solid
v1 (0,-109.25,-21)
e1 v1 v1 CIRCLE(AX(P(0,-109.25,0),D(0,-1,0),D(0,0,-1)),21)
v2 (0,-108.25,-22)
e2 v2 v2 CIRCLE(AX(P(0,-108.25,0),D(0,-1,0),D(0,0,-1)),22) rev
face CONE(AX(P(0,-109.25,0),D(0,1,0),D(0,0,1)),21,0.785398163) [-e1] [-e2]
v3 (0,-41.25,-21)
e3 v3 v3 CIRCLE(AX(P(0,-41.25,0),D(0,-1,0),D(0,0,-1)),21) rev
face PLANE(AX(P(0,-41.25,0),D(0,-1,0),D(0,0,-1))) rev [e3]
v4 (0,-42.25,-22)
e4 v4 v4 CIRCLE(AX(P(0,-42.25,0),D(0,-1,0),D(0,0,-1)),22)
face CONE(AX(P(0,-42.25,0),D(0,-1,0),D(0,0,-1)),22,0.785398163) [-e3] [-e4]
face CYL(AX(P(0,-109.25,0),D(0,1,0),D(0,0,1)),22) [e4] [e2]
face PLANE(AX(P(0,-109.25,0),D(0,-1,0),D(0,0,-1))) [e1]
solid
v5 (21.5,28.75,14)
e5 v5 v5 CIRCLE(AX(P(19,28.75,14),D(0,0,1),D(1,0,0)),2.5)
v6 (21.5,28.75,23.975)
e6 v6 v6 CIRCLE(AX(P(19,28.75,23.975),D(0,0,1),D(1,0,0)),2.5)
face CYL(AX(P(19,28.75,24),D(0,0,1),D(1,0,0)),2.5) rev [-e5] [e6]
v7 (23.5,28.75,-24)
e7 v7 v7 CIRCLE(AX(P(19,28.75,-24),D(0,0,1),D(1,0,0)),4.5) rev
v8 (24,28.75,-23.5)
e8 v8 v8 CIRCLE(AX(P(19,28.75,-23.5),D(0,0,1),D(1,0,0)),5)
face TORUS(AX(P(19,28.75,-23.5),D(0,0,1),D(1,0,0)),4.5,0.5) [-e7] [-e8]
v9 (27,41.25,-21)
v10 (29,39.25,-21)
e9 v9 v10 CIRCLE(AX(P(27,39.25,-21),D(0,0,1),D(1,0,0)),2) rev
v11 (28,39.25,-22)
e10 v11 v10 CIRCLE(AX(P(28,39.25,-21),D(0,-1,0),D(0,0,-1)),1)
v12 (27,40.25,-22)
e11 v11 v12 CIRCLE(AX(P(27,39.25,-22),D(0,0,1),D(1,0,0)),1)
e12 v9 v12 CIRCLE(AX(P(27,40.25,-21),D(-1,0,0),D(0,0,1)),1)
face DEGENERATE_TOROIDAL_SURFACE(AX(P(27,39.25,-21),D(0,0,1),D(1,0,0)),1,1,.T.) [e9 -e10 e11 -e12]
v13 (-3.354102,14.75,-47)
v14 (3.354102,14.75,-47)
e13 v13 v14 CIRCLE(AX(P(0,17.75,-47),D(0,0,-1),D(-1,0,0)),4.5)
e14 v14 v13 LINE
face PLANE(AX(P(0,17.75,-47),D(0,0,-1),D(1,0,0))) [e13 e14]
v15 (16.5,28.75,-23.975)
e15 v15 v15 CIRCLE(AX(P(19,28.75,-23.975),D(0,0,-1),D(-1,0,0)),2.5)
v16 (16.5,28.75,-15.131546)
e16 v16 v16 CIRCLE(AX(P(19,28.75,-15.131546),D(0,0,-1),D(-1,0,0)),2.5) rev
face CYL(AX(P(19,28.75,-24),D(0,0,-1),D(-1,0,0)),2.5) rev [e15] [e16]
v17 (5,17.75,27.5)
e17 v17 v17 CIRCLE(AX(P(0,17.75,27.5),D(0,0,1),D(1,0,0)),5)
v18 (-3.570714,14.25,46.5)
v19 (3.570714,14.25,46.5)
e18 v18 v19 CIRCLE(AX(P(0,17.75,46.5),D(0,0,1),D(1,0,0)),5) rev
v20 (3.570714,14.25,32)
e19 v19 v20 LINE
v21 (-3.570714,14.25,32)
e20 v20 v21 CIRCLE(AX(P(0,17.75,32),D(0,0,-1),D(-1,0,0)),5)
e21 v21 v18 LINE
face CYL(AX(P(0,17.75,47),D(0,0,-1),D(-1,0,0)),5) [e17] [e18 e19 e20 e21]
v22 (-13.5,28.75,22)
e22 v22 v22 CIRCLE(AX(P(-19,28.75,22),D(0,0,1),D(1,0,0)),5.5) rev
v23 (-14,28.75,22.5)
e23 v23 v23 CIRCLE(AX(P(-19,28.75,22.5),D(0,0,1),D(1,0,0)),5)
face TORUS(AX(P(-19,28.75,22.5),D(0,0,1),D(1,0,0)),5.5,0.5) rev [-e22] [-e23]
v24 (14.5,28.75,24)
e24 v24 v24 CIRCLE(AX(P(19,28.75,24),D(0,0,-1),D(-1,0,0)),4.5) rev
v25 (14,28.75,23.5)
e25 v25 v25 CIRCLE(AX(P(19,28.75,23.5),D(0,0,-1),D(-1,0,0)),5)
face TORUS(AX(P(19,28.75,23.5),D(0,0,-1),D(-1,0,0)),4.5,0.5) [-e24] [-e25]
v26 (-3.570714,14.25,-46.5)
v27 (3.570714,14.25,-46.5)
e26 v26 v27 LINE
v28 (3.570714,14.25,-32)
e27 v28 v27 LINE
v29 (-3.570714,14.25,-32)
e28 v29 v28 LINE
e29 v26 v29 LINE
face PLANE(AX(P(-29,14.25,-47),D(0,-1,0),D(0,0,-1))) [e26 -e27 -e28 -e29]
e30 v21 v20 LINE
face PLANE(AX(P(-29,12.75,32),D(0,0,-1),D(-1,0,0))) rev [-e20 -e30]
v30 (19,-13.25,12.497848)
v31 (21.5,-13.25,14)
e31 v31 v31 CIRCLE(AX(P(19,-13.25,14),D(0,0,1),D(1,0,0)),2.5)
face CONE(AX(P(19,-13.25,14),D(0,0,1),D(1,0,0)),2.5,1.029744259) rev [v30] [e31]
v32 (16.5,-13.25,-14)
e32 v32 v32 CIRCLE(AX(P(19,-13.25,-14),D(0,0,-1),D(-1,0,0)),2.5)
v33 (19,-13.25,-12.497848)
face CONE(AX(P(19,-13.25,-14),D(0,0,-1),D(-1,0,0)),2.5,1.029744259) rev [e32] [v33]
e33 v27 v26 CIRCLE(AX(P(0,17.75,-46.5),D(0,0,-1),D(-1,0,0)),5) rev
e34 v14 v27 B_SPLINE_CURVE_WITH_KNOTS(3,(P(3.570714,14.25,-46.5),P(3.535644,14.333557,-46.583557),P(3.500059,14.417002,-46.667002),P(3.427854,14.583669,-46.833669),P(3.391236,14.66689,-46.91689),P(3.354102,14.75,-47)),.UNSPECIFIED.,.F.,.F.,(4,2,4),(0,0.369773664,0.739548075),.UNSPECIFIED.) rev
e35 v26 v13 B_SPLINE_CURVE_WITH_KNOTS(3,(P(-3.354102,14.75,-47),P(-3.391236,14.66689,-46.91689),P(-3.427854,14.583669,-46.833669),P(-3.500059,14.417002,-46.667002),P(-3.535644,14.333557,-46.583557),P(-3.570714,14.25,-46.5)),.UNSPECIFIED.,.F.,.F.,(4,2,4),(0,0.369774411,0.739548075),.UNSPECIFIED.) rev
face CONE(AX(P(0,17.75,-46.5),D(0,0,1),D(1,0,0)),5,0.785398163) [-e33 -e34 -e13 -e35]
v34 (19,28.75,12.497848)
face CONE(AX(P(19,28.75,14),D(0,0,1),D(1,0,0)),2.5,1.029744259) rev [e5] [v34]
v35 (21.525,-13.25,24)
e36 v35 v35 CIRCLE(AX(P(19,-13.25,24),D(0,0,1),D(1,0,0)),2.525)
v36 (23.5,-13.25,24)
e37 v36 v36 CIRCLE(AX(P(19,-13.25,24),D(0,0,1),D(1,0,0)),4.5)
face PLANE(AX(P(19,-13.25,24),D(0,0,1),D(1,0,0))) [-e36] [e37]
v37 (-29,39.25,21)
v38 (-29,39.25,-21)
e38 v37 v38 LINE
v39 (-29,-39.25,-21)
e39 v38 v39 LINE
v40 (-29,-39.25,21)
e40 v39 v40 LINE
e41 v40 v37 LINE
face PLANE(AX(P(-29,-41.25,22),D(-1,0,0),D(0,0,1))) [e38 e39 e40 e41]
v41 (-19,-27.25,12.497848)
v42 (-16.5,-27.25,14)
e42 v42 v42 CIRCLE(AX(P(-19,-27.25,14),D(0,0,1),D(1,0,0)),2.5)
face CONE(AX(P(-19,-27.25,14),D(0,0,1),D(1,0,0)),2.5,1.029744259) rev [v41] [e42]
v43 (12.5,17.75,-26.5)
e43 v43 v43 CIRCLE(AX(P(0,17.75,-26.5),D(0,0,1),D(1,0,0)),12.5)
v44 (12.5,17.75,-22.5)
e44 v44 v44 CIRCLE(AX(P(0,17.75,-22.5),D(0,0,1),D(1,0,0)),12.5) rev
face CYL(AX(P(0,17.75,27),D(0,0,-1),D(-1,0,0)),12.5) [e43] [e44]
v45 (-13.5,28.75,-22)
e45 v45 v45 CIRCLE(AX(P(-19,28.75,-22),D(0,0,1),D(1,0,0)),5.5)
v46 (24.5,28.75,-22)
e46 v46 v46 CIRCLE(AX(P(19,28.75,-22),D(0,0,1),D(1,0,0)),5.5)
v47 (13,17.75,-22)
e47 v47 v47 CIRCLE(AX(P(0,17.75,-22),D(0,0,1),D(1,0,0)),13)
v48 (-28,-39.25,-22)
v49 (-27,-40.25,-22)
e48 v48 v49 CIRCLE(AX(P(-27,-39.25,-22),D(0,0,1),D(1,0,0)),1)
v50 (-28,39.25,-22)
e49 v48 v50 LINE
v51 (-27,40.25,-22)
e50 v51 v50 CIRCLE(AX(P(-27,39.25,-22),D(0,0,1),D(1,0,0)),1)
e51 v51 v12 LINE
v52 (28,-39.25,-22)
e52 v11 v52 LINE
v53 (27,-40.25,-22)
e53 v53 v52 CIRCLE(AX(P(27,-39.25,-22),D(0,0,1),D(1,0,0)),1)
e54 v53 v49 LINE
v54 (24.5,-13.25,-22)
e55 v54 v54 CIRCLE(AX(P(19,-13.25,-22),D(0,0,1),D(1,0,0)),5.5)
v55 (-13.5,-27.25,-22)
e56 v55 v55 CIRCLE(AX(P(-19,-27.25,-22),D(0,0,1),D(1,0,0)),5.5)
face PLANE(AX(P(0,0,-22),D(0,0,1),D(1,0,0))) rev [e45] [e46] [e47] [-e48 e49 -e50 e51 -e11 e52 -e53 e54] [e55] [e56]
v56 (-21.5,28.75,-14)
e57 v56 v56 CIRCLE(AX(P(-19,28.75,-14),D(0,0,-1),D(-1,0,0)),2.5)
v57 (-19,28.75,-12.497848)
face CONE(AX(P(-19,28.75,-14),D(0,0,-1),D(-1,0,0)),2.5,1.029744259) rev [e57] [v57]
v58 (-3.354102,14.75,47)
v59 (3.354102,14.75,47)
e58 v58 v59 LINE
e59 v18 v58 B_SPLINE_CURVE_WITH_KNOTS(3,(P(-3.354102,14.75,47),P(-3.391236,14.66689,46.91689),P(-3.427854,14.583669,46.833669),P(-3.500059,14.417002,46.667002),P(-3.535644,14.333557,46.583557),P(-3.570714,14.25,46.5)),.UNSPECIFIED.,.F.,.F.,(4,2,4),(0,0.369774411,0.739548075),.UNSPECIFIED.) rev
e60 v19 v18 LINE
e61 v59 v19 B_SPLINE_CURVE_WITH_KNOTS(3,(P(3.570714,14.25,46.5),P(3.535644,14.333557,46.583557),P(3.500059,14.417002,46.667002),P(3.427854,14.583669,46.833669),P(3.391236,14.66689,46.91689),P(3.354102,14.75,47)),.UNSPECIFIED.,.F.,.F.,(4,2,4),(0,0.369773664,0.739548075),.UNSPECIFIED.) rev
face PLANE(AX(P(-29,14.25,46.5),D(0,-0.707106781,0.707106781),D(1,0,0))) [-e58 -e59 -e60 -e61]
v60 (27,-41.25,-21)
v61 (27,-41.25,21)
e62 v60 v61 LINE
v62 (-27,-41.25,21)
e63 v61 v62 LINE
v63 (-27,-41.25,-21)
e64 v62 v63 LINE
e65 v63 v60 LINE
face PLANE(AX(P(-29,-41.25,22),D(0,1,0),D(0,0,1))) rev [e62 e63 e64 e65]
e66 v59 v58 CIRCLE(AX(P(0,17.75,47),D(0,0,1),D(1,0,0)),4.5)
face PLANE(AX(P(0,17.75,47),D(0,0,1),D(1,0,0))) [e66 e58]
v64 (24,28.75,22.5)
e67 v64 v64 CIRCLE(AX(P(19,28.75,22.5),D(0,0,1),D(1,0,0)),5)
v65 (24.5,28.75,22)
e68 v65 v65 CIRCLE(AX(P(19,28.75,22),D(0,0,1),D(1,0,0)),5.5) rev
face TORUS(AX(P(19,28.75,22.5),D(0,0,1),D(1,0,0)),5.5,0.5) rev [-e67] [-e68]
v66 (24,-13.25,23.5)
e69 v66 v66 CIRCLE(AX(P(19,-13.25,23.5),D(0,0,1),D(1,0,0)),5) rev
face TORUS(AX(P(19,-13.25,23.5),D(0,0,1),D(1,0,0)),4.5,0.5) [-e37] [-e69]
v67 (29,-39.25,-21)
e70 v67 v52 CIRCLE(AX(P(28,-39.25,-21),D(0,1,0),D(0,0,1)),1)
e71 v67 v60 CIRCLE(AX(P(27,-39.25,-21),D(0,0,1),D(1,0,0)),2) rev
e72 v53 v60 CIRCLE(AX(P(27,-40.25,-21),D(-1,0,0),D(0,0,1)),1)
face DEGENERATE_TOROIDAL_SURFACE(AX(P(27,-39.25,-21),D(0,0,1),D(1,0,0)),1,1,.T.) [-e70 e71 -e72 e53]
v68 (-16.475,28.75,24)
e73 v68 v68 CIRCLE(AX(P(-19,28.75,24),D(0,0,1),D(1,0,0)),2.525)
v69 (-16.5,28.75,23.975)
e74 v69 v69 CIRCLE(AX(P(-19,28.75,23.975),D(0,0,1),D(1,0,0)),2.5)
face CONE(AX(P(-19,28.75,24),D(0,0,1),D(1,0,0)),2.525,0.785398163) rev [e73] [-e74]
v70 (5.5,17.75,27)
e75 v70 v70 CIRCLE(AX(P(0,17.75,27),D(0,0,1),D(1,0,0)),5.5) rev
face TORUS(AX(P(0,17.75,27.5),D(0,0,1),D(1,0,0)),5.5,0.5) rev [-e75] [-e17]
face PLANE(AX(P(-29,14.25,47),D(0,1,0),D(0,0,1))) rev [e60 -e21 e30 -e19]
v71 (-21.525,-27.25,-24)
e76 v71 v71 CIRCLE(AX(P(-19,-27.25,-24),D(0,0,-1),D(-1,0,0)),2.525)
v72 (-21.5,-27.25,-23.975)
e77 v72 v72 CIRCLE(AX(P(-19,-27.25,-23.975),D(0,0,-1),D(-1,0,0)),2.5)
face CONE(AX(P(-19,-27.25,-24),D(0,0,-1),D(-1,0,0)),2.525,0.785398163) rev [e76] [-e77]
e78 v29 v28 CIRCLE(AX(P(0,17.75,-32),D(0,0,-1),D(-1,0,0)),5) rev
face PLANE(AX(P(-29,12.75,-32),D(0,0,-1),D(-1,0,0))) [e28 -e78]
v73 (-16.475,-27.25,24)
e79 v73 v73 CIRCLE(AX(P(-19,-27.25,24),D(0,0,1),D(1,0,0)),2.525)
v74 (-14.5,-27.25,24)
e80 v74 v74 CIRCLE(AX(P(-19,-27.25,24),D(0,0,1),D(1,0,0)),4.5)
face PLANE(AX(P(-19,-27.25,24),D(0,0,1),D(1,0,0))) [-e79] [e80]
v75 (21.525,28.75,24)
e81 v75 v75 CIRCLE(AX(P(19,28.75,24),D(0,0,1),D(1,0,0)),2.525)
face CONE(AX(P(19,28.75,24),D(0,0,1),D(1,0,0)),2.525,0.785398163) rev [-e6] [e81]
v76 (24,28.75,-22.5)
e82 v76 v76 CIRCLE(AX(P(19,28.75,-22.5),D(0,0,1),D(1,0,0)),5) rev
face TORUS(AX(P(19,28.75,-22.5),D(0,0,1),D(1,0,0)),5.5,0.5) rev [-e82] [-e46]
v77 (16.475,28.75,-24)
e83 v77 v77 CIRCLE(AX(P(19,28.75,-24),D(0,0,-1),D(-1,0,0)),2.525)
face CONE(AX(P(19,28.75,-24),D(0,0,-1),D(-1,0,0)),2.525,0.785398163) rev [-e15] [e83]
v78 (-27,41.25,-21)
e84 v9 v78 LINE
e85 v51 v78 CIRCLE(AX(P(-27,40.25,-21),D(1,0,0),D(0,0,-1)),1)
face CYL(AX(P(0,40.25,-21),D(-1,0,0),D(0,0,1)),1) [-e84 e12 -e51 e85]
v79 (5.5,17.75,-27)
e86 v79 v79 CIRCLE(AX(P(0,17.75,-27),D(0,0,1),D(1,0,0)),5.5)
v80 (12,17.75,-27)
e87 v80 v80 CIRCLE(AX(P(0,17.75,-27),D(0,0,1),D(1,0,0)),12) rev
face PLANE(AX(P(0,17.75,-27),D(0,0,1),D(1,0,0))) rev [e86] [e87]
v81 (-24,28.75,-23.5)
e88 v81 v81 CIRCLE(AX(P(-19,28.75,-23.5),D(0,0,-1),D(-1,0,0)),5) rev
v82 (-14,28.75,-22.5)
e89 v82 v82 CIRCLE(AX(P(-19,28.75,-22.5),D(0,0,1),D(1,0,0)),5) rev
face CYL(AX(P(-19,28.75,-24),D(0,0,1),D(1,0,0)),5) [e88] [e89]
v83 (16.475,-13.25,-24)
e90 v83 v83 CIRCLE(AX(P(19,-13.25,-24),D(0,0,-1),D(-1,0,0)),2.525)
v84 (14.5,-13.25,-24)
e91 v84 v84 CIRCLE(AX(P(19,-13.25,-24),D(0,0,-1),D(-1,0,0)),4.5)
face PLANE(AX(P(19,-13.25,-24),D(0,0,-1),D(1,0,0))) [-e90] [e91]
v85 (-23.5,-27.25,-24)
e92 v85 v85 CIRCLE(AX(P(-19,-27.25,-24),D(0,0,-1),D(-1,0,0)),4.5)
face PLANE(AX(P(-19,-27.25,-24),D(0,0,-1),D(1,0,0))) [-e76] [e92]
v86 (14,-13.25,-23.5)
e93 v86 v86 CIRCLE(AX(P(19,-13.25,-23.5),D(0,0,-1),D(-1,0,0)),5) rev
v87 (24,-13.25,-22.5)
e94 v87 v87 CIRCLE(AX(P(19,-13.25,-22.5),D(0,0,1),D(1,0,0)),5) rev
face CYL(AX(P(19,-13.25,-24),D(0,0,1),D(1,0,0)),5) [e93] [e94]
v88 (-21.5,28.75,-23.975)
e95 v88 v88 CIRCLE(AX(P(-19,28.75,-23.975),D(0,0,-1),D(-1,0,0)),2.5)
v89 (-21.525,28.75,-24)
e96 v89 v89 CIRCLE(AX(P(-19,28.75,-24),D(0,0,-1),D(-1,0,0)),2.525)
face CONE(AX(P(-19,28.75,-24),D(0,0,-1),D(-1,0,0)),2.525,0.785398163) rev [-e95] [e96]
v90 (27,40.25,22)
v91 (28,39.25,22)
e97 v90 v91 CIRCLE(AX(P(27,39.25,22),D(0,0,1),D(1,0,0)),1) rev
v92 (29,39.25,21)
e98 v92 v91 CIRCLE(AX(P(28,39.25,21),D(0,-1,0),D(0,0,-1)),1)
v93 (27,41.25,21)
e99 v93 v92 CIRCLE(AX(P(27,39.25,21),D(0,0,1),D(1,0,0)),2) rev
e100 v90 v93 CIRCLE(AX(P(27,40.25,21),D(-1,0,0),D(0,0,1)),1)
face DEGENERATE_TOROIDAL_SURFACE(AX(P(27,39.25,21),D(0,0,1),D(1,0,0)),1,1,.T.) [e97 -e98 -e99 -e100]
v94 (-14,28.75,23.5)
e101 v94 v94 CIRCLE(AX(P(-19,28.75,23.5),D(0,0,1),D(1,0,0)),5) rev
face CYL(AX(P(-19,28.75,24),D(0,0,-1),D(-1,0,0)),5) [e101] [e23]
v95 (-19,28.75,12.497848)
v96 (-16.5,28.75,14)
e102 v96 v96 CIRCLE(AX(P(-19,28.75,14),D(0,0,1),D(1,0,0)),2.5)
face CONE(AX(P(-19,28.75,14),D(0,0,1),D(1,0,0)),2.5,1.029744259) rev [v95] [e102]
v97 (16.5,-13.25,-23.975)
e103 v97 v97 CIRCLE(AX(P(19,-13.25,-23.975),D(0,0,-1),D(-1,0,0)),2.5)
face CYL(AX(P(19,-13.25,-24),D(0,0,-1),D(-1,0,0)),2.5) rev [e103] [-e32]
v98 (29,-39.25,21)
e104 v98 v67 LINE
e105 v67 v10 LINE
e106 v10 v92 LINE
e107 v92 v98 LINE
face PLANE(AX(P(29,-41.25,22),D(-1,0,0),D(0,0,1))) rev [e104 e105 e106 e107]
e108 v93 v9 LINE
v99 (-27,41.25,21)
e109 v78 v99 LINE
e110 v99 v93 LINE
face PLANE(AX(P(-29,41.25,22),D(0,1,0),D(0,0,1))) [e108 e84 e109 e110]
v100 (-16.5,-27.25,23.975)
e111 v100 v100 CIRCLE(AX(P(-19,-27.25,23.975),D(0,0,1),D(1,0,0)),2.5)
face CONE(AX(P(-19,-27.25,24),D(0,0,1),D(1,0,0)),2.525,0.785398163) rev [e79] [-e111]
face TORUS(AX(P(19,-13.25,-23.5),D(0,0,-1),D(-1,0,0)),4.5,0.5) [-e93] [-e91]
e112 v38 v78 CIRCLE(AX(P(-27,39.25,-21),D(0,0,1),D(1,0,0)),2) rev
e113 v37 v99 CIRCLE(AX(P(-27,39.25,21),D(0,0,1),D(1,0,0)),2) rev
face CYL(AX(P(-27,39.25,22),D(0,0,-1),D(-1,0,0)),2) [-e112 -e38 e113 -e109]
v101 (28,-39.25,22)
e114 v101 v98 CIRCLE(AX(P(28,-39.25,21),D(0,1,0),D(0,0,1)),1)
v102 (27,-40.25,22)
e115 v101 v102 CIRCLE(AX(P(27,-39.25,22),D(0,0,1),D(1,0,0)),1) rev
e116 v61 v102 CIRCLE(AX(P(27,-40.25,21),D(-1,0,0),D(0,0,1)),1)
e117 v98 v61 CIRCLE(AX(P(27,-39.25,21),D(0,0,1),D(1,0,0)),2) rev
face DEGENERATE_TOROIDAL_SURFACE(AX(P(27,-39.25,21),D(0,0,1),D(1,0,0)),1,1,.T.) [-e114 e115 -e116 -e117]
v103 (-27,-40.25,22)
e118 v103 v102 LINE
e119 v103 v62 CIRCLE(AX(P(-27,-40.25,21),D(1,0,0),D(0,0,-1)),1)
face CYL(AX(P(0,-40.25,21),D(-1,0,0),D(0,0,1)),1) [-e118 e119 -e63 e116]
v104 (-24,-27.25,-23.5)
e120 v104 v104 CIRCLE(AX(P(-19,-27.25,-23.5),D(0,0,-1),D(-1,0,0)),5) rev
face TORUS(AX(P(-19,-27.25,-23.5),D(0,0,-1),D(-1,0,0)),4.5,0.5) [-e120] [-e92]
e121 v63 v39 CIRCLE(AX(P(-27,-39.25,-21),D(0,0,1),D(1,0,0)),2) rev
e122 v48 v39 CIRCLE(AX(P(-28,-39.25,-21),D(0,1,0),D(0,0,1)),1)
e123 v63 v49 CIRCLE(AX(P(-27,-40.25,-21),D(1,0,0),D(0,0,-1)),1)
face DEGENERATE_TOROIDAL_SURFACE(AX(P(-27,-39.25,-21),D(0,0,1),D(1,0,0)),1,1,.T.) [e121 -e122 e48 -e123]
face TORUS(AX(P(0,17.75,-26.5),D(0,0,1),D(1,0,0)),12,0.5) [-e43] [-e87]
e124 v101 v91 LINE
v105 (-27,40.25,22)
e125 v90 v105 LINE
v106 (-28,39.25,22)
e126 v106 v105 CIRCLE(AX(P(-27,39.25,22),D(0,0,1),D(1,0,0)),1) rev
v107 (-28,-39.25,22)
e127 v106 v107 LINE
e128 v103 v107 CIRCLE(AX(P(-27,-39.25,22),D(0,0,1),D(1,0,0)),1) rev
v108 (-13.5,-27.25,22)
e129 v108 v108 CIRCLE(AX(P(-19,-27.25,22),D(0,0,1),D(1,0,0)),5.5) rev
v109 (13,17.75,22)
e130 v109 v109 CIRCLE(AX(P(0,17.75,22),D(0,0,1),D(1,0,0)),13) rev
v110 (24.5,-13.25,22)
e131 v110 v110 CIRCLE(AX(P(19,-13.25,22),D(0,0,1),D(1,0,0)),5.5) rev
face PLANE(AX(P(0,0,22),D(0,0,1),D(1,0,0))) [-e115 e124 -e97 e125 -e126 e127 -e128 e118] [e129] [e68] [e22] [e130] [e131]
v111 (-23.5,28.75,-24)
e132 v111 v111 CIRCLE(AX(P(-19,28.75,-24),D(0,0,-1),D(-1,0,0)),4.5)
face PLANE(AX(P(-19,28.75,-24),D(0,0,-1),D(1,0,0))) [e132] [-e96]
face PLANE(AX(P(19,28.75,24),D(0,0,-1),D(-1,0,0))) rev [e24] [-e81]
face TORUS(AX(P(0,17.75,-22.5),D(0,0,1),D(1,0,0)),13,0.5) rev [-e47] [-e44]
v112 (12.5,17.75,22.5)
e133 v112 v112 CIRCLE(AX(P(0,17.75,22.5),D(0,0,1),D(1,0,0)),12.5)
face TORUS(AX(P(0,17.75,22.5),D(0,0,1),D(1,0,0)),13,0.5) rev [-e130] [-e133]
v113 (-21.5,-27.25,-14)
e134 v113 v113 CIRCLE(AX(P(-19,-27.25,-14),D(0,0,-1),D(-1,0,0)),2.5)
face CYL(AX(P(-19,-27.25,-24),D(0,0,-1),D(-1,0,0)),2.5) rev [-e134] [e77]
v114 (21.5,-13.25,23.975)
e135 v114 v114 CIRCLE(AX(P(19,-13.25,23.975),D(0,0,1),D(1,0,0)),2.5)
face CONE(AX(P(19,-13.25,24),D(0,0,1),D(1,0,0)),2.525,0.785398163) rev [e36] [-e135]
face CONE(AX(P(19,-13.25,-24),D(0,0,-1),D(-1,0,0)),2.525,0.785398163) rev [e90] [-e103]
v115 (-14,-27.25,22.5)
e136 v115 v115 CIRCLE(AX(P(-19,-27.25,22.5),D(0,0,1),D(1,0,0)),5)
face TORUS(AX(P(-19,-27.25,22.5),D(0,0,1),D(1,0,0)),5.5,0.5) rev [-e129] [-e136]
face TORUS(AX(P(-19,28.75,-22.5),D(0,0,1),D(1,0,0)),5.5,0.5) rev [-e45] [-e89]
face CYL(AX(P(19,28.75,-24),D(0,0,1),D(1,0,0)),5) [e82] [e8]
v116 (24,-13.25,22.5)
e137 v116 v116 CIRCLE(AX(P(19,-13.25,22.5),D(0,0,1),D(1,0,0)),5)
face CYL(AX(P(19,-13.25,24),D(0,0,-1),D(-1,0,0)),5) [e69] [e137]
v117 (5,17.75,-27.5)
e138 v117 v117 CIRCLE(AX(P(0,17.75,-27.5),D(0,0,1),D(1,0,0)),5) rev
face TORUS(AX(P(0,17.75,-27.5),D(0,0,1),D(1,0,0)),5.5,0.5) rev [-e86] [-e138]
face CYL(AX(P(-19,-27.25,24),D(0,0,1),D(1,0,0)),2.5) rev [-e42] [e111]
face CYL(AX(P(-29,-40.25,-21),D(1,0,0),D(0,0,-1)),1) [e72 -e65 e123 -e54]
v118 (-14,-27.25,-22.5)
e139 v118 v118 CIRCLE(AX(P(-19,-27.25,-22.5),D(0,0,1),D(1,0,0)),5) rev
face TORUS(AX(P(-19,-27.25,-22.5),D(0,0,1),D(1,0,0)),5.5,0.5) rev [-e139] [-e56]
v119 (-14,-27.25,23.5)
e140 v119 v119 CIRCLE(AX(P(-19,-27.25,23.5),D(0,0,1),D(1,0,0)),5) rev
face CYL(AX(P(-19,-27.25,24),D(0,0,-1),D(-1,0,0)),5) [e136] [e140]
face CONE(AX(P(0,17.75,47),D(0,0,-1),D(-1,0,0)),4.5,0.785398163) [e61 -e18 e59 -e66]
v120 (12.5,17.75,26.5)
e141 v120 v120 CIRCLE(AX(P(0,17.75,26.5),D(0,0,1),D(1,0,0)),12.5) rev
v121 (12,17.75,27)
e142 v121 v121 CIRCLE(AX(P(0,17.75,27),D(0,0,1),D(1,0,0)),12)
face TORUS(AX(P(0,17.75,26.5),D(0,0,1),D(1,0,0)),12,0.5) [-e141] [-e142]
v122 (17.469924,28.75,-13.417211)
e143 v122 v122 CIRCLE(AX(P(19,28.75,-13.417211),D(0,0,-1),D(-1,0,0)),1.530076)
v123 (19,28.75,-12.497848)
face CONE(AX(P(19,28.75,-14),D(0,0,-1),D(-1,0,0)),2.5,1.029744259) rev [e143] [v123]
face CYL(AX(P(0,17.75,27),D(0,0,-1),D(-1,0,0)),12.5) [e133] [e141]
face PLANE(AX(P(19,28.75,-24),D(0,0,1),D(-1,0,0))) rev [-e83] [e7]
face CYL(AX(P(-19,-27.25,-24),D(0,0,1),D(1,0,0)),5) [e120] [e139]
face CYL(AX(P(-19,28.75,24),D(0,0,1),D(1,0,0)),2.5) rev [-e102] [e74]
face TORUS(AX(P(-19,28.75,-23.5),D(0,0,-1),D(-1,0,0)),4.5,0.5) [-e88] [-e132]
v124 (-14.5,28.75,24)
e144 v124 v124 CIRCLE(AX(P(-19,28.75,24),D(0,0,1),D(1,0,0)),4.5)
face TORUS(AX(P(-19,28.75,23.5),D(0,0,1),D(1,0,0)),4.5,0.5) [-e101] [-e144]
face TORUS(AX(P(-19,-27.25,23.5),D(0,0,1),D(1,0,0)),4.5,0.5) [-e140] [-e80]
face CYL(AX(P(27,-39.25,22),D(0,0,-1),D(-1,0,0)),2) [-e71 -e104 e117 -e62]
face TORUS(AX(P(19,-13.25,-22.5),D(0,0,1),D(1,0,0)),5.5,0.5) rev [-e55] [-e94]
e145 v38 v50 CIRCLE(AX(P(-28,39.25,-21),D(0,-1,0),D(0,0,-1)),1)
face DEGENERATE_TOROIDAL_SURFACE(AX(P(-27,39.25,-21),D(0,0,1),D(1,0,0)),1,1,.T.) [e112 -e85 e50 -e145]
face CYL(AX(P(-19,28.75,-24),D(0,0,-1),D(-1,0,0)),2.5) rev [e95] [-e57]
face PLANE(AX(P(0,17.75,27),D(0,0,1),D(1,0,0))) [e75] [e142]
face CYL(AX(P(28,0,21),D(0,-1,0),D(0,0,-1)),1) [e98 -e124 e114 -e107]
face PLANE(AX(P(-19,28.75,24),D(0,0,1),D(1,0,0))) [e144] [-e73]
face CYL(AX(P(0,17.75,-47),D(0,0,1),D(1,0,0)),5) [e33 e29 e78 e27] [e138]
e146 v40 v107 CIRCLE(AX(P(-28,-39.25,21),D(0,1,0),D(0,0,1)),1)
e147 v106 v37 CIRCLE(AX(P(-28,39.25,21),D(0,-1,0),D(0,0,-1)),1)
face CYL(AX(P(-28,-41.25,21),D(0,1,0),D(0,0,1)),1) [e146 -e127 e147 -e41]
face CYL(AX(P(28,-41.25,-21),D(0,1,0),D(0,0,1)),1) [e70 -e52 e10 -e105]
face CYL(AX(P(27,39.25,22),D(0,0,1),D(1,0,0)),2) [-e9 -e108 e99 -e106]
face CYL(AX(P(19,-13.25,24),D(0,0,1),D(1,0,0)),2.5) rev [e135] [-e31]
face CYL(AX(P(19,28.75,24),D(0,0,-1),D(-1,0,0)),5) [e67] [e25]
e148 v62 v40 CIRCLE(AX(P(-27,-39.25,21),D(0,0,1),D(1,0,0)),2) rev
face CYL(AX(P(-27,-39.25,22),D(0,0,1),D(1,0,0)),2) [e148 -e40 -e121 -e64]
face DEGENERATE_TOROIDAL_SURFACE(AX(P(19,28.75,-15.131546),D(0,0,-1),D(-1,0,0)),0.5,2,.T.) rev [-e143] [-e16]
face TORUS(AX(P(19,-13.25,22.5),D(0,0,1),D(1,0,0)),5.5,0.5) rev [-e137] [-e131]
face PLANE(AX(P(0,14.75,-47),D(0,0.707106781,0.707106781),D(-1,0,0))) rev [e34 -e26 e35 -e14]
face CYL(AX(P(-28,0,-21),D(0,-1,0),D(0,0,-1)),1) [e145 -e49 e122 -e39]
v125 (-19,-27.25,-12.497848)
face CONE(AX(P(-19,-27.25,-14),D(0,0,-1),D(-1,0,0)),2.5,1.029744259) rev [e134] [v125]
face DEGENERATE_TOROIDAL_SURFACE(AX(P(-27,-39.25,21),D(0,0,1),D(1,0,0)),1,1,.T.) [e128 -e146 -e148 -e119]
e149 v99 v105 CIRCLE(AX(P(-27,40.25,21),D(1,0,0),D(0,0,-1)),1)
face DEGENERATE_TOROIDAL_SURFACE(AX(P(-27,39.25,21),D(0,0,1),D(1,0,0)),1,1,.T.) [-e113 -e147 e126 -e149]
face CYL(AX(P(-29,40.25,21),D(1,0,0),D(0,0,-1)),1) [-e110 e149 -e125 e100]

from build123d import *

# Parameters (mm, degrees)
SKETCH1_W                         = 58
SKETCH1_H                         = 82.5
BOSS_EXTRUDE1_DEPTH               = 22
BOSS_EXTRUDE2_START               = -22
SKETCH2_R                         = 12.5
BOSS_EXTRUDE2_DEPTH               = 27
SKETCH3_R                         = 5
BOSS_EXTRUDE3_DEPTH               = 20
SKETCH4_W                         = 15
SKETCH4_H                         = 1.5
CUT_EXTRUDE1_DEPTH                = 69.931578395
SKETCH5_R                         = 5
BOSS_EXTRUDE4_DEPTH               = 2
F_5_0_5_DIAMETER_HOLE1_AT_2_COUNT = 2
F_5_0_5_DIAMETER_HOLE1_AT_2_PITCH = 42
F_5_0_5_DIAMETER_HOLE1_AT_3_COUNT = 2
F_5_0_5_DIAMETER_HOLE1_AT_3_PITCH = 67.675697263
F_5_0_5_DIAMETER_HOLE1_AT_4_COUNT = 2
F_5_0_5_DIAMETER_HOLE1_AT_4_PITCH = 38
CHAMFER1_SIZE                     = 0.5
CHAMFER1_OF_MIRROR3_SIZE          = 0.5
FILLET1_R                         = 0.5
FILLET3_R                         = 1
FILLET4_R                         = 2
SKETCH10_R                        = 22
BOSS_EXTRUDE5_DEPTH               = 68
CHAMFER2_SIZE                     = 1


with BuildPart() as part:
    # Sketch1 → Boss-Extrude1 (new, symmetric)
    with BuildSketch(Plane.XY):
        Rectangle(SKETCH1_W, SKETCH1_H)
    extrude(amount=BOSS_EXTRUDE1_DEPTH, both=True)

    # Sketch2 → Boss-Extrude2 (add, symmetric)
    with BuildSketch(Plane.XY.offset(22).offset(BOSS_EXTRUDE2_START)):
        with Locations((0, 17.75)):
            Circle(SKETCH2_R)
    extrude(amount=BOSS_EXTRUDE2_DEPTH, both=True)

    # Sketch3 → Boss-Extrude3 (add)
    with BuildSketch(Plane.XY.offset(27)):
        with Locations((0, 17.75)):
            Circle(SKETCH3_R)
    boss_extrude3 = extrude(amount=BOSS_EXTRUDE3_DEPTH)

    # Sketch4 → Cut-Extrude1 (cut, symmetric)
    with BuildSketch(Plane(origin=(0, 0, 0), x_dir=(0, 0, -1), z_dir=(1, 0, 0))):
        with Locations((-39.5, 13.5)):
            Rectangle(SKETCH4_W, SKETCH4_H)
    cut_extrude1 = extrude(amount=CUT_EXTRUDE1_DEPTH, both=True, mode=Mode.SUBTRACT)

    # Sketch5 → Boss-Extrude4 (add)
    with BuildSketch(Plane.XY.offset(22)):
        with Locations((-19, 28.75)):
            Circle(SKETCH5_R)
        with Locations(Location((19, 28.75, 0), (0, 0, 180))):
            Circle(SKETCH5_R)
        with Locations((-19, -27.25)):
            Circle(SKETCH5_R)
        with Locations((19, -13.25)):
            Circle(SKETCH5_R)
    boss_extrude4 = extrude(amount=BOSS_EXTRUDE4_DEPTH)

    # Sketch9 → Ø5.0 (5) Diameter Hole1 (revolve, cut)
    with BuildSketch(Plane(origin=(19, 28.75, 24), x_dir=(0, -1, 0), z_dir=(1, 0, 0))):
        Polygon((0, 0), (0, 11.502151548), (2.5, 10), (2.5, 0.025), (2.525, 0), align=None)
    f_5_0_5_diameter_hole1 = revolve(axis=Axis((19, 28.75, 30.35), (0, 0, -1)), mode=Mode.SUBTRACT)

    # Ø5.0 (5) Diameter Hole1 at 2: Ø5.0 (5) Diameter Hole1 ×2
    with Locations(*[(0, -i * F_5_0_5_DIAMETER_HOLE1_AT_2_PITCH, 0) for i in range(1, F_5_0_5_DIAMETER_HOLE1_AT_2_COUNT)]):
        add(f_5_0_5_diameter_hole1, mode=Mode.SUBTRACT)

    # Ø5.0 (5) Diameter Hole1 at 3: Ø5.0 (5) Diameter Hole1 ×2
    with Locations(*[Vector(-0.5615014183372646, -0.8274757743917585, 0) * (i * F_5_0_5_DIAMETER_HOLE1_AT_3_PITCH) for i in range(1, F_5_0_5_DIAMETER_HOLE1_AT_3_COUNT)]):
        add(f_5_0_5_diameter_hole1, mode=Mode.SUBTRACT)

    # Ø5.0 (5) Diameter Hole1 at 4: Ø5.0 (5) Diameter Hole1 ×2
    with Locations(*[(-i * F_5_0_5_DIAMETER_HOLE1_AT_4_PITCH, 0, 0) for i in range(1, F_5_0_5_DIAMETER_HOLE1_AT_4_COUNT)]):
        add(f_5_0_5_diameter_hole1, mode=Mode.SUBTRACT)

    # Chamfer1
    chamfer1_edges = [part.edges().sort_by_distance(p)[0] for p in [
        (-1.890294809, 22.378907596, 47),
        (0, 14.25, 47),
    ]]
    chamfer(chamfer1_edges, length=CHAMFER1_SIZE)

    # Mirror3: Boss-Extrude3, Cut-Extrude1, Boss-Extrude4, Ø5.0 (5) Diameter Hole1 across plane
    add(boss_extrude3.mirror(Plane.XY))
    add(cut_extrude1.mirror(Plane.XY), mode=Mode.SUBTRACT)
    add(boss_extrude4.mirror(Plane.XY))
    add(f_5_0_5_diameter_hole1.mirror(Plane.XY), mode=Mode.SUBTRACT)

    # Mirror3 copy 1 sketch → Mirror3 copy 1 (revolve, cut)
    with BuildSketch(Plane(origin=(19, -13.25, -24), x_dir=(0, -1, 0), z_dir=(1, 0, 0))):
        Polygon((0, 0), (0, -11.502151548), (2.5, -10), (2.5, -0.025), (2.525, 0), align=None)
    revolve(axis=Axis((19, -13.25, -30.35), (0, 0, -1)), mode=Mode.SUBTRACT)

    # Mirror3 copy 2 sketch → Mirror3 copy 2 (revolve, cut)
    with BuildSketch(Plane(origin=(-19, -27.25, -24), x_dir=(0, -1, 0), z_dir=(1, 0, 0))):
        Polygon((0, 0), (0, -11.502151548), (2.5, -10), (2.5, -0.025), (2.525, 0), align=None)
    revolve(axis=Axis((-19, -27.25, -30.35), (0, 0, -1)), mode=Mode.SUBTRACT)

    # Mirror3 copy 3 sketch → Mirror3 copy 3 (revolve, cut)
    with BuildSketch(Plane(origin=(-19, 28.75, -24), x_dir=(0, -1, 0), z_dir=(1, 0, 0))):
        Polygon((0, 0), (0, -11.502151548), (2.5, -10), (2.5, -0.025), (2.525, 0), align=None)
    revolve(axis=Axis((-19, 28.75, -30.35), (0, 0, -1)), mode=Mode.SUBTRACT)

    # Chamfer1 of Mirror3
    chamfer1_of_mirror3_edges = [part.edges().sort_by_distance(p)[0] for p in [
        (-1.890294809, 22.378907596, -47),
        (0, 14.25, -47),
    ]]
    chamfer(chamfer1_of_mirror3_edges, length=CHAMFER1_OF_MIRROR3_SIZE)

    # Fillet1
    fillet1_edges = [part.edges().sort_by_distance(p)[0] for p in [
        (-24, 28.75, -24),
        (-24, 28.75, -22),
        (24, 28.75, -24),
        (24, 28.75, -22),
        (-24, -27.25, -24),
        (-24, -27.25, -22),
        (14, -13.25, -24),
        (14, -13.25, -22),
        (-12.5, 17.75, -22),
        (-12.5, 17.75, 22),
        (-12.5, 17.75, -27),
        (-12.5, 17.75, 27),
        (-5, 17.75, 27),
        (-24, 28.75, 22),
        (-24, 28.75, 24),
        (24, 28.75, 22),
        (24, 28.75, 24),
        (-24, -27.25, 22),
        (-24, -27.25, 24),
        (14, -13.25, 22),
        (14, -13.25, 24),
        (-5, 17.75, -27),
    ]]
    fillet(fillet1_edges, radius=FILLET1_R)

    # Fillet3
    fillet3_edges = [part.edges().sort_by_distance(p)[0] for p in [
        (0, 41.25, 22),
        (-29, 0, 22),
        (0, -41.25, 22),
        (-29, 0, -22),
        (0, 41.25, -22),
        (29, 0, -22),
        (0, -41.25, -22),
        (29, 0, 22),
    ]]
    fillet(fillet3_edges, radius=FILLET3_R)

    # Fillet4
    # the kernel refuses this fillet: 2 mm, written as the material it adds along each edge
    with BuildSketch(Plane(origin=(19, 28.75, -14), x_dir=(0, -1, 0), z_dir=(1, 0, 0))) as fillet4_piece_1:
        with BuildLine():
            CenterArc((2.5 - FILLET4_R, FILLET4_R * 0.565772778188), FILLET4_R, 301, 59)
            Line((2.5 - FILLET4_R * 0.48496192509, -FILLET4_R * 0.291394522514), (2.5, 0))
            Line((2.5, 0), (2.5, FILLET4_R * 0.565772778188))
        make_face()
    revolve(axis=Axis((19, 28.75, -14), (0, 0, -1)))
    # the kernel refuses this fillet: 2 mm, written as the material it takes off along each edge
    with BuildSketch(Plane(origin=(-27, -39.25, -22), x_dir=(0, -1, 0), z_dir=(1, 0, 0))) as fillet4_2_piece_1:
        with BuildLine():
            CenterArc((1, -1), 1, 0, 90)
            Line((2, -1), (2, 0))
            Line((2, 0), (1, 0))
        make_face()
    revolve(axis=Axis((-27, -39.25, -22), (0, 0, -1)), revolution_arc=90, mode=Mode.SUBTRACT)
    with BuildSketch(Plane(origin=(-27, 39.25, -22), x_dir=(-1, 0, 0), z_dir=(0, -1, 0))) as fillet4_2_piece_2:
        with BuildLine():
            CenterArc((1, -1), 1, 0, 90)
            Line((2, -1), (2, 0))
            Line((2, 0), (1, 0))
        make_face()
    revolve(axis=Axis((-27, 39.25, -22), (0, 0, -1)), revolution_arc=90, mode=Mode.SUBTRACT)
    with BuildSketch(Plane(origin=(27, -39.25, -22), x_dir=(1, 0, 0), z_dir=(0, 1, 0))) as fillet4_2_piece_3:
        with BuildLine():
            CenterArc((1, -1), 1, 0, 90)
            Line((2, -1), (2, 0))
            Line((2, 0), (1, 0))
        make_face()
    revolve(axis=Axis((27, -39.25, -22), (0, 0, -1)), revolution_arc=90, mode=Mode.SUBTRACT)
    with BuildSketch(Plane(origin=(27, 39.25, -22), x_dir=(0, 1, 0), z_dir=(-1, 0, 0))) as fillet4_2_piece_4:
        with BuildLine():
            CenterArc((1, -1), 1, 0, 90)
            Line((2, -1), (2, 0))
            Line((2, 0), (1, 0))
        make_face()
    revolve(axis=Axis((27, 39.25, -22), (0, 0, -1)), revolution_arc=90, mode=Mode.SUBTRACT)
    with BuildSketch(Plane(origin=(-27, 39.25, 22), x_dir=(0, 1, 0), z_dir=(1, 0, 0))) as fillet4_2_piece_5:
        with BuildLine():
            CenterArc((1, -1), 1, 0, 90)
            Line((2, -1), (2, 0))
            Line((2, 0), (1, 0))
        make_face()
    revolve(axis=Axis((-27, 39.25, 22), (0, 0, 1)), revolution_arc=90, mode=Mode.SUBTRACT)
    with BuildSketch(Plane(origin=(27, 39.25, 22), x_dir=(1, 0, 0), z_dir=(0, -1, 0))) as fillet4_2_piece_6:
        with BuildLine():
            CenterArc((1, -1), 1, 0, 90)
            Line((2, -1), (2, 0))
            Line((2, 0), (1, 0))
        make_face()
    revolve(axis=Axis((27, 39.25, 22), (0, 0, 1)), revolution_arc=90, mode=Mode.SUBTRACT)
    with BuildSketch(Plane(origin=(-27, -39.25, 22), x_dir=(-1, 0, 0), z_dir=(0, 1, 0))) as fillet4_2_piece_7:
        with BuildLine():
            CenterArc((1, -1), 1, 0, 90)
            Line((2, -1), (2, 0))
            Line((2, 0), (1, 0))
        make_face()
    revolve(axis=Axis((-27, -39.25, 22), (0, 0, 1)), revolution_arc=90, mode=Mode.SUBTRACT)
    with BuildSketch(Plane(origin=(27, -39.25, 22), x_dir=(0, -1, 0), z_dir=(-1, 0, 0))) as fillet4_2_piece_8:
        with BuildLine():
            CenterArc((1, -1), 1, 0, 90)
            Line((2, -1), (2, 0))
            Line((2, 0), (1, 0))
        make_face()
    revolve(axis=Axis((27, -39.25, 22), (0, 0, 1)), revolution_arc=90, mode=Mode.SUBTRACT)
    with BuildSketch(Plane(origin=(29, 41.25, -22), x_dir=(-1, 0, 0), z_dir=(0, 0, 1)), Plane(origin=(-29, -41.25, 22), x_dir=(0, 1, 0), z_dir=(0, 0, -1))) as fillet4_2_piece_9:
        with BuildLine():
            CenterArc((FILLET4_R, FILLET4_R), FILLET4_R, 180, 90)
            Line((0, FILLET4_R), (0, 0))
            Line((0, 0), (FILLET4_R, 0))
        make_face()
    extrude(amount=44, mode=Mode.SUBTRACT)
    with BuildSketch(Plane(origin=(29, -41.25, -22), x_dir=(-1, 0, 0), z_dir=(0, 0, 1)), Plane(origin=(-29, 41.25, 22), x_dir=(0, -1, 0), z_dir=(0, 0, -1))) as fillet4_2_piece_10:
        with BuildLine():
            CenterArc((FILLET4_R, -FILLET4_R), FILLET4_R, 90, 90)
            Line((0, -FILLET4_R), (0, 0))
            Line((0, 0), (FILLET4_R, 0))
        make_face()
    extrude(amount=44, mode=Mode.SUBTRACT)


with BuildPart() as body_2:
    # Sketch10 → Boss-Extrude5 (new body)
    with BuildSketch(Plane.XZ.offset(41.25)):
        with Locations(Location((0, 0, 0), (0, 0, 270))):
            Circle(SKETCH10_R)
    extrude(amount=BOSS_EXTRUDE5_DEPTH)

    # Chamfer2
    chamfer2_edges = [body_2.edges().sort_by_distance(p)[0] for p in [
        (0, -41.25, 22),
        (0, -109.25, 22),
    ]]
    chamfer(chamfer2_edges, length=CHAMFER2_SIZE)


solid = Compound([part.part, body_2.part])
